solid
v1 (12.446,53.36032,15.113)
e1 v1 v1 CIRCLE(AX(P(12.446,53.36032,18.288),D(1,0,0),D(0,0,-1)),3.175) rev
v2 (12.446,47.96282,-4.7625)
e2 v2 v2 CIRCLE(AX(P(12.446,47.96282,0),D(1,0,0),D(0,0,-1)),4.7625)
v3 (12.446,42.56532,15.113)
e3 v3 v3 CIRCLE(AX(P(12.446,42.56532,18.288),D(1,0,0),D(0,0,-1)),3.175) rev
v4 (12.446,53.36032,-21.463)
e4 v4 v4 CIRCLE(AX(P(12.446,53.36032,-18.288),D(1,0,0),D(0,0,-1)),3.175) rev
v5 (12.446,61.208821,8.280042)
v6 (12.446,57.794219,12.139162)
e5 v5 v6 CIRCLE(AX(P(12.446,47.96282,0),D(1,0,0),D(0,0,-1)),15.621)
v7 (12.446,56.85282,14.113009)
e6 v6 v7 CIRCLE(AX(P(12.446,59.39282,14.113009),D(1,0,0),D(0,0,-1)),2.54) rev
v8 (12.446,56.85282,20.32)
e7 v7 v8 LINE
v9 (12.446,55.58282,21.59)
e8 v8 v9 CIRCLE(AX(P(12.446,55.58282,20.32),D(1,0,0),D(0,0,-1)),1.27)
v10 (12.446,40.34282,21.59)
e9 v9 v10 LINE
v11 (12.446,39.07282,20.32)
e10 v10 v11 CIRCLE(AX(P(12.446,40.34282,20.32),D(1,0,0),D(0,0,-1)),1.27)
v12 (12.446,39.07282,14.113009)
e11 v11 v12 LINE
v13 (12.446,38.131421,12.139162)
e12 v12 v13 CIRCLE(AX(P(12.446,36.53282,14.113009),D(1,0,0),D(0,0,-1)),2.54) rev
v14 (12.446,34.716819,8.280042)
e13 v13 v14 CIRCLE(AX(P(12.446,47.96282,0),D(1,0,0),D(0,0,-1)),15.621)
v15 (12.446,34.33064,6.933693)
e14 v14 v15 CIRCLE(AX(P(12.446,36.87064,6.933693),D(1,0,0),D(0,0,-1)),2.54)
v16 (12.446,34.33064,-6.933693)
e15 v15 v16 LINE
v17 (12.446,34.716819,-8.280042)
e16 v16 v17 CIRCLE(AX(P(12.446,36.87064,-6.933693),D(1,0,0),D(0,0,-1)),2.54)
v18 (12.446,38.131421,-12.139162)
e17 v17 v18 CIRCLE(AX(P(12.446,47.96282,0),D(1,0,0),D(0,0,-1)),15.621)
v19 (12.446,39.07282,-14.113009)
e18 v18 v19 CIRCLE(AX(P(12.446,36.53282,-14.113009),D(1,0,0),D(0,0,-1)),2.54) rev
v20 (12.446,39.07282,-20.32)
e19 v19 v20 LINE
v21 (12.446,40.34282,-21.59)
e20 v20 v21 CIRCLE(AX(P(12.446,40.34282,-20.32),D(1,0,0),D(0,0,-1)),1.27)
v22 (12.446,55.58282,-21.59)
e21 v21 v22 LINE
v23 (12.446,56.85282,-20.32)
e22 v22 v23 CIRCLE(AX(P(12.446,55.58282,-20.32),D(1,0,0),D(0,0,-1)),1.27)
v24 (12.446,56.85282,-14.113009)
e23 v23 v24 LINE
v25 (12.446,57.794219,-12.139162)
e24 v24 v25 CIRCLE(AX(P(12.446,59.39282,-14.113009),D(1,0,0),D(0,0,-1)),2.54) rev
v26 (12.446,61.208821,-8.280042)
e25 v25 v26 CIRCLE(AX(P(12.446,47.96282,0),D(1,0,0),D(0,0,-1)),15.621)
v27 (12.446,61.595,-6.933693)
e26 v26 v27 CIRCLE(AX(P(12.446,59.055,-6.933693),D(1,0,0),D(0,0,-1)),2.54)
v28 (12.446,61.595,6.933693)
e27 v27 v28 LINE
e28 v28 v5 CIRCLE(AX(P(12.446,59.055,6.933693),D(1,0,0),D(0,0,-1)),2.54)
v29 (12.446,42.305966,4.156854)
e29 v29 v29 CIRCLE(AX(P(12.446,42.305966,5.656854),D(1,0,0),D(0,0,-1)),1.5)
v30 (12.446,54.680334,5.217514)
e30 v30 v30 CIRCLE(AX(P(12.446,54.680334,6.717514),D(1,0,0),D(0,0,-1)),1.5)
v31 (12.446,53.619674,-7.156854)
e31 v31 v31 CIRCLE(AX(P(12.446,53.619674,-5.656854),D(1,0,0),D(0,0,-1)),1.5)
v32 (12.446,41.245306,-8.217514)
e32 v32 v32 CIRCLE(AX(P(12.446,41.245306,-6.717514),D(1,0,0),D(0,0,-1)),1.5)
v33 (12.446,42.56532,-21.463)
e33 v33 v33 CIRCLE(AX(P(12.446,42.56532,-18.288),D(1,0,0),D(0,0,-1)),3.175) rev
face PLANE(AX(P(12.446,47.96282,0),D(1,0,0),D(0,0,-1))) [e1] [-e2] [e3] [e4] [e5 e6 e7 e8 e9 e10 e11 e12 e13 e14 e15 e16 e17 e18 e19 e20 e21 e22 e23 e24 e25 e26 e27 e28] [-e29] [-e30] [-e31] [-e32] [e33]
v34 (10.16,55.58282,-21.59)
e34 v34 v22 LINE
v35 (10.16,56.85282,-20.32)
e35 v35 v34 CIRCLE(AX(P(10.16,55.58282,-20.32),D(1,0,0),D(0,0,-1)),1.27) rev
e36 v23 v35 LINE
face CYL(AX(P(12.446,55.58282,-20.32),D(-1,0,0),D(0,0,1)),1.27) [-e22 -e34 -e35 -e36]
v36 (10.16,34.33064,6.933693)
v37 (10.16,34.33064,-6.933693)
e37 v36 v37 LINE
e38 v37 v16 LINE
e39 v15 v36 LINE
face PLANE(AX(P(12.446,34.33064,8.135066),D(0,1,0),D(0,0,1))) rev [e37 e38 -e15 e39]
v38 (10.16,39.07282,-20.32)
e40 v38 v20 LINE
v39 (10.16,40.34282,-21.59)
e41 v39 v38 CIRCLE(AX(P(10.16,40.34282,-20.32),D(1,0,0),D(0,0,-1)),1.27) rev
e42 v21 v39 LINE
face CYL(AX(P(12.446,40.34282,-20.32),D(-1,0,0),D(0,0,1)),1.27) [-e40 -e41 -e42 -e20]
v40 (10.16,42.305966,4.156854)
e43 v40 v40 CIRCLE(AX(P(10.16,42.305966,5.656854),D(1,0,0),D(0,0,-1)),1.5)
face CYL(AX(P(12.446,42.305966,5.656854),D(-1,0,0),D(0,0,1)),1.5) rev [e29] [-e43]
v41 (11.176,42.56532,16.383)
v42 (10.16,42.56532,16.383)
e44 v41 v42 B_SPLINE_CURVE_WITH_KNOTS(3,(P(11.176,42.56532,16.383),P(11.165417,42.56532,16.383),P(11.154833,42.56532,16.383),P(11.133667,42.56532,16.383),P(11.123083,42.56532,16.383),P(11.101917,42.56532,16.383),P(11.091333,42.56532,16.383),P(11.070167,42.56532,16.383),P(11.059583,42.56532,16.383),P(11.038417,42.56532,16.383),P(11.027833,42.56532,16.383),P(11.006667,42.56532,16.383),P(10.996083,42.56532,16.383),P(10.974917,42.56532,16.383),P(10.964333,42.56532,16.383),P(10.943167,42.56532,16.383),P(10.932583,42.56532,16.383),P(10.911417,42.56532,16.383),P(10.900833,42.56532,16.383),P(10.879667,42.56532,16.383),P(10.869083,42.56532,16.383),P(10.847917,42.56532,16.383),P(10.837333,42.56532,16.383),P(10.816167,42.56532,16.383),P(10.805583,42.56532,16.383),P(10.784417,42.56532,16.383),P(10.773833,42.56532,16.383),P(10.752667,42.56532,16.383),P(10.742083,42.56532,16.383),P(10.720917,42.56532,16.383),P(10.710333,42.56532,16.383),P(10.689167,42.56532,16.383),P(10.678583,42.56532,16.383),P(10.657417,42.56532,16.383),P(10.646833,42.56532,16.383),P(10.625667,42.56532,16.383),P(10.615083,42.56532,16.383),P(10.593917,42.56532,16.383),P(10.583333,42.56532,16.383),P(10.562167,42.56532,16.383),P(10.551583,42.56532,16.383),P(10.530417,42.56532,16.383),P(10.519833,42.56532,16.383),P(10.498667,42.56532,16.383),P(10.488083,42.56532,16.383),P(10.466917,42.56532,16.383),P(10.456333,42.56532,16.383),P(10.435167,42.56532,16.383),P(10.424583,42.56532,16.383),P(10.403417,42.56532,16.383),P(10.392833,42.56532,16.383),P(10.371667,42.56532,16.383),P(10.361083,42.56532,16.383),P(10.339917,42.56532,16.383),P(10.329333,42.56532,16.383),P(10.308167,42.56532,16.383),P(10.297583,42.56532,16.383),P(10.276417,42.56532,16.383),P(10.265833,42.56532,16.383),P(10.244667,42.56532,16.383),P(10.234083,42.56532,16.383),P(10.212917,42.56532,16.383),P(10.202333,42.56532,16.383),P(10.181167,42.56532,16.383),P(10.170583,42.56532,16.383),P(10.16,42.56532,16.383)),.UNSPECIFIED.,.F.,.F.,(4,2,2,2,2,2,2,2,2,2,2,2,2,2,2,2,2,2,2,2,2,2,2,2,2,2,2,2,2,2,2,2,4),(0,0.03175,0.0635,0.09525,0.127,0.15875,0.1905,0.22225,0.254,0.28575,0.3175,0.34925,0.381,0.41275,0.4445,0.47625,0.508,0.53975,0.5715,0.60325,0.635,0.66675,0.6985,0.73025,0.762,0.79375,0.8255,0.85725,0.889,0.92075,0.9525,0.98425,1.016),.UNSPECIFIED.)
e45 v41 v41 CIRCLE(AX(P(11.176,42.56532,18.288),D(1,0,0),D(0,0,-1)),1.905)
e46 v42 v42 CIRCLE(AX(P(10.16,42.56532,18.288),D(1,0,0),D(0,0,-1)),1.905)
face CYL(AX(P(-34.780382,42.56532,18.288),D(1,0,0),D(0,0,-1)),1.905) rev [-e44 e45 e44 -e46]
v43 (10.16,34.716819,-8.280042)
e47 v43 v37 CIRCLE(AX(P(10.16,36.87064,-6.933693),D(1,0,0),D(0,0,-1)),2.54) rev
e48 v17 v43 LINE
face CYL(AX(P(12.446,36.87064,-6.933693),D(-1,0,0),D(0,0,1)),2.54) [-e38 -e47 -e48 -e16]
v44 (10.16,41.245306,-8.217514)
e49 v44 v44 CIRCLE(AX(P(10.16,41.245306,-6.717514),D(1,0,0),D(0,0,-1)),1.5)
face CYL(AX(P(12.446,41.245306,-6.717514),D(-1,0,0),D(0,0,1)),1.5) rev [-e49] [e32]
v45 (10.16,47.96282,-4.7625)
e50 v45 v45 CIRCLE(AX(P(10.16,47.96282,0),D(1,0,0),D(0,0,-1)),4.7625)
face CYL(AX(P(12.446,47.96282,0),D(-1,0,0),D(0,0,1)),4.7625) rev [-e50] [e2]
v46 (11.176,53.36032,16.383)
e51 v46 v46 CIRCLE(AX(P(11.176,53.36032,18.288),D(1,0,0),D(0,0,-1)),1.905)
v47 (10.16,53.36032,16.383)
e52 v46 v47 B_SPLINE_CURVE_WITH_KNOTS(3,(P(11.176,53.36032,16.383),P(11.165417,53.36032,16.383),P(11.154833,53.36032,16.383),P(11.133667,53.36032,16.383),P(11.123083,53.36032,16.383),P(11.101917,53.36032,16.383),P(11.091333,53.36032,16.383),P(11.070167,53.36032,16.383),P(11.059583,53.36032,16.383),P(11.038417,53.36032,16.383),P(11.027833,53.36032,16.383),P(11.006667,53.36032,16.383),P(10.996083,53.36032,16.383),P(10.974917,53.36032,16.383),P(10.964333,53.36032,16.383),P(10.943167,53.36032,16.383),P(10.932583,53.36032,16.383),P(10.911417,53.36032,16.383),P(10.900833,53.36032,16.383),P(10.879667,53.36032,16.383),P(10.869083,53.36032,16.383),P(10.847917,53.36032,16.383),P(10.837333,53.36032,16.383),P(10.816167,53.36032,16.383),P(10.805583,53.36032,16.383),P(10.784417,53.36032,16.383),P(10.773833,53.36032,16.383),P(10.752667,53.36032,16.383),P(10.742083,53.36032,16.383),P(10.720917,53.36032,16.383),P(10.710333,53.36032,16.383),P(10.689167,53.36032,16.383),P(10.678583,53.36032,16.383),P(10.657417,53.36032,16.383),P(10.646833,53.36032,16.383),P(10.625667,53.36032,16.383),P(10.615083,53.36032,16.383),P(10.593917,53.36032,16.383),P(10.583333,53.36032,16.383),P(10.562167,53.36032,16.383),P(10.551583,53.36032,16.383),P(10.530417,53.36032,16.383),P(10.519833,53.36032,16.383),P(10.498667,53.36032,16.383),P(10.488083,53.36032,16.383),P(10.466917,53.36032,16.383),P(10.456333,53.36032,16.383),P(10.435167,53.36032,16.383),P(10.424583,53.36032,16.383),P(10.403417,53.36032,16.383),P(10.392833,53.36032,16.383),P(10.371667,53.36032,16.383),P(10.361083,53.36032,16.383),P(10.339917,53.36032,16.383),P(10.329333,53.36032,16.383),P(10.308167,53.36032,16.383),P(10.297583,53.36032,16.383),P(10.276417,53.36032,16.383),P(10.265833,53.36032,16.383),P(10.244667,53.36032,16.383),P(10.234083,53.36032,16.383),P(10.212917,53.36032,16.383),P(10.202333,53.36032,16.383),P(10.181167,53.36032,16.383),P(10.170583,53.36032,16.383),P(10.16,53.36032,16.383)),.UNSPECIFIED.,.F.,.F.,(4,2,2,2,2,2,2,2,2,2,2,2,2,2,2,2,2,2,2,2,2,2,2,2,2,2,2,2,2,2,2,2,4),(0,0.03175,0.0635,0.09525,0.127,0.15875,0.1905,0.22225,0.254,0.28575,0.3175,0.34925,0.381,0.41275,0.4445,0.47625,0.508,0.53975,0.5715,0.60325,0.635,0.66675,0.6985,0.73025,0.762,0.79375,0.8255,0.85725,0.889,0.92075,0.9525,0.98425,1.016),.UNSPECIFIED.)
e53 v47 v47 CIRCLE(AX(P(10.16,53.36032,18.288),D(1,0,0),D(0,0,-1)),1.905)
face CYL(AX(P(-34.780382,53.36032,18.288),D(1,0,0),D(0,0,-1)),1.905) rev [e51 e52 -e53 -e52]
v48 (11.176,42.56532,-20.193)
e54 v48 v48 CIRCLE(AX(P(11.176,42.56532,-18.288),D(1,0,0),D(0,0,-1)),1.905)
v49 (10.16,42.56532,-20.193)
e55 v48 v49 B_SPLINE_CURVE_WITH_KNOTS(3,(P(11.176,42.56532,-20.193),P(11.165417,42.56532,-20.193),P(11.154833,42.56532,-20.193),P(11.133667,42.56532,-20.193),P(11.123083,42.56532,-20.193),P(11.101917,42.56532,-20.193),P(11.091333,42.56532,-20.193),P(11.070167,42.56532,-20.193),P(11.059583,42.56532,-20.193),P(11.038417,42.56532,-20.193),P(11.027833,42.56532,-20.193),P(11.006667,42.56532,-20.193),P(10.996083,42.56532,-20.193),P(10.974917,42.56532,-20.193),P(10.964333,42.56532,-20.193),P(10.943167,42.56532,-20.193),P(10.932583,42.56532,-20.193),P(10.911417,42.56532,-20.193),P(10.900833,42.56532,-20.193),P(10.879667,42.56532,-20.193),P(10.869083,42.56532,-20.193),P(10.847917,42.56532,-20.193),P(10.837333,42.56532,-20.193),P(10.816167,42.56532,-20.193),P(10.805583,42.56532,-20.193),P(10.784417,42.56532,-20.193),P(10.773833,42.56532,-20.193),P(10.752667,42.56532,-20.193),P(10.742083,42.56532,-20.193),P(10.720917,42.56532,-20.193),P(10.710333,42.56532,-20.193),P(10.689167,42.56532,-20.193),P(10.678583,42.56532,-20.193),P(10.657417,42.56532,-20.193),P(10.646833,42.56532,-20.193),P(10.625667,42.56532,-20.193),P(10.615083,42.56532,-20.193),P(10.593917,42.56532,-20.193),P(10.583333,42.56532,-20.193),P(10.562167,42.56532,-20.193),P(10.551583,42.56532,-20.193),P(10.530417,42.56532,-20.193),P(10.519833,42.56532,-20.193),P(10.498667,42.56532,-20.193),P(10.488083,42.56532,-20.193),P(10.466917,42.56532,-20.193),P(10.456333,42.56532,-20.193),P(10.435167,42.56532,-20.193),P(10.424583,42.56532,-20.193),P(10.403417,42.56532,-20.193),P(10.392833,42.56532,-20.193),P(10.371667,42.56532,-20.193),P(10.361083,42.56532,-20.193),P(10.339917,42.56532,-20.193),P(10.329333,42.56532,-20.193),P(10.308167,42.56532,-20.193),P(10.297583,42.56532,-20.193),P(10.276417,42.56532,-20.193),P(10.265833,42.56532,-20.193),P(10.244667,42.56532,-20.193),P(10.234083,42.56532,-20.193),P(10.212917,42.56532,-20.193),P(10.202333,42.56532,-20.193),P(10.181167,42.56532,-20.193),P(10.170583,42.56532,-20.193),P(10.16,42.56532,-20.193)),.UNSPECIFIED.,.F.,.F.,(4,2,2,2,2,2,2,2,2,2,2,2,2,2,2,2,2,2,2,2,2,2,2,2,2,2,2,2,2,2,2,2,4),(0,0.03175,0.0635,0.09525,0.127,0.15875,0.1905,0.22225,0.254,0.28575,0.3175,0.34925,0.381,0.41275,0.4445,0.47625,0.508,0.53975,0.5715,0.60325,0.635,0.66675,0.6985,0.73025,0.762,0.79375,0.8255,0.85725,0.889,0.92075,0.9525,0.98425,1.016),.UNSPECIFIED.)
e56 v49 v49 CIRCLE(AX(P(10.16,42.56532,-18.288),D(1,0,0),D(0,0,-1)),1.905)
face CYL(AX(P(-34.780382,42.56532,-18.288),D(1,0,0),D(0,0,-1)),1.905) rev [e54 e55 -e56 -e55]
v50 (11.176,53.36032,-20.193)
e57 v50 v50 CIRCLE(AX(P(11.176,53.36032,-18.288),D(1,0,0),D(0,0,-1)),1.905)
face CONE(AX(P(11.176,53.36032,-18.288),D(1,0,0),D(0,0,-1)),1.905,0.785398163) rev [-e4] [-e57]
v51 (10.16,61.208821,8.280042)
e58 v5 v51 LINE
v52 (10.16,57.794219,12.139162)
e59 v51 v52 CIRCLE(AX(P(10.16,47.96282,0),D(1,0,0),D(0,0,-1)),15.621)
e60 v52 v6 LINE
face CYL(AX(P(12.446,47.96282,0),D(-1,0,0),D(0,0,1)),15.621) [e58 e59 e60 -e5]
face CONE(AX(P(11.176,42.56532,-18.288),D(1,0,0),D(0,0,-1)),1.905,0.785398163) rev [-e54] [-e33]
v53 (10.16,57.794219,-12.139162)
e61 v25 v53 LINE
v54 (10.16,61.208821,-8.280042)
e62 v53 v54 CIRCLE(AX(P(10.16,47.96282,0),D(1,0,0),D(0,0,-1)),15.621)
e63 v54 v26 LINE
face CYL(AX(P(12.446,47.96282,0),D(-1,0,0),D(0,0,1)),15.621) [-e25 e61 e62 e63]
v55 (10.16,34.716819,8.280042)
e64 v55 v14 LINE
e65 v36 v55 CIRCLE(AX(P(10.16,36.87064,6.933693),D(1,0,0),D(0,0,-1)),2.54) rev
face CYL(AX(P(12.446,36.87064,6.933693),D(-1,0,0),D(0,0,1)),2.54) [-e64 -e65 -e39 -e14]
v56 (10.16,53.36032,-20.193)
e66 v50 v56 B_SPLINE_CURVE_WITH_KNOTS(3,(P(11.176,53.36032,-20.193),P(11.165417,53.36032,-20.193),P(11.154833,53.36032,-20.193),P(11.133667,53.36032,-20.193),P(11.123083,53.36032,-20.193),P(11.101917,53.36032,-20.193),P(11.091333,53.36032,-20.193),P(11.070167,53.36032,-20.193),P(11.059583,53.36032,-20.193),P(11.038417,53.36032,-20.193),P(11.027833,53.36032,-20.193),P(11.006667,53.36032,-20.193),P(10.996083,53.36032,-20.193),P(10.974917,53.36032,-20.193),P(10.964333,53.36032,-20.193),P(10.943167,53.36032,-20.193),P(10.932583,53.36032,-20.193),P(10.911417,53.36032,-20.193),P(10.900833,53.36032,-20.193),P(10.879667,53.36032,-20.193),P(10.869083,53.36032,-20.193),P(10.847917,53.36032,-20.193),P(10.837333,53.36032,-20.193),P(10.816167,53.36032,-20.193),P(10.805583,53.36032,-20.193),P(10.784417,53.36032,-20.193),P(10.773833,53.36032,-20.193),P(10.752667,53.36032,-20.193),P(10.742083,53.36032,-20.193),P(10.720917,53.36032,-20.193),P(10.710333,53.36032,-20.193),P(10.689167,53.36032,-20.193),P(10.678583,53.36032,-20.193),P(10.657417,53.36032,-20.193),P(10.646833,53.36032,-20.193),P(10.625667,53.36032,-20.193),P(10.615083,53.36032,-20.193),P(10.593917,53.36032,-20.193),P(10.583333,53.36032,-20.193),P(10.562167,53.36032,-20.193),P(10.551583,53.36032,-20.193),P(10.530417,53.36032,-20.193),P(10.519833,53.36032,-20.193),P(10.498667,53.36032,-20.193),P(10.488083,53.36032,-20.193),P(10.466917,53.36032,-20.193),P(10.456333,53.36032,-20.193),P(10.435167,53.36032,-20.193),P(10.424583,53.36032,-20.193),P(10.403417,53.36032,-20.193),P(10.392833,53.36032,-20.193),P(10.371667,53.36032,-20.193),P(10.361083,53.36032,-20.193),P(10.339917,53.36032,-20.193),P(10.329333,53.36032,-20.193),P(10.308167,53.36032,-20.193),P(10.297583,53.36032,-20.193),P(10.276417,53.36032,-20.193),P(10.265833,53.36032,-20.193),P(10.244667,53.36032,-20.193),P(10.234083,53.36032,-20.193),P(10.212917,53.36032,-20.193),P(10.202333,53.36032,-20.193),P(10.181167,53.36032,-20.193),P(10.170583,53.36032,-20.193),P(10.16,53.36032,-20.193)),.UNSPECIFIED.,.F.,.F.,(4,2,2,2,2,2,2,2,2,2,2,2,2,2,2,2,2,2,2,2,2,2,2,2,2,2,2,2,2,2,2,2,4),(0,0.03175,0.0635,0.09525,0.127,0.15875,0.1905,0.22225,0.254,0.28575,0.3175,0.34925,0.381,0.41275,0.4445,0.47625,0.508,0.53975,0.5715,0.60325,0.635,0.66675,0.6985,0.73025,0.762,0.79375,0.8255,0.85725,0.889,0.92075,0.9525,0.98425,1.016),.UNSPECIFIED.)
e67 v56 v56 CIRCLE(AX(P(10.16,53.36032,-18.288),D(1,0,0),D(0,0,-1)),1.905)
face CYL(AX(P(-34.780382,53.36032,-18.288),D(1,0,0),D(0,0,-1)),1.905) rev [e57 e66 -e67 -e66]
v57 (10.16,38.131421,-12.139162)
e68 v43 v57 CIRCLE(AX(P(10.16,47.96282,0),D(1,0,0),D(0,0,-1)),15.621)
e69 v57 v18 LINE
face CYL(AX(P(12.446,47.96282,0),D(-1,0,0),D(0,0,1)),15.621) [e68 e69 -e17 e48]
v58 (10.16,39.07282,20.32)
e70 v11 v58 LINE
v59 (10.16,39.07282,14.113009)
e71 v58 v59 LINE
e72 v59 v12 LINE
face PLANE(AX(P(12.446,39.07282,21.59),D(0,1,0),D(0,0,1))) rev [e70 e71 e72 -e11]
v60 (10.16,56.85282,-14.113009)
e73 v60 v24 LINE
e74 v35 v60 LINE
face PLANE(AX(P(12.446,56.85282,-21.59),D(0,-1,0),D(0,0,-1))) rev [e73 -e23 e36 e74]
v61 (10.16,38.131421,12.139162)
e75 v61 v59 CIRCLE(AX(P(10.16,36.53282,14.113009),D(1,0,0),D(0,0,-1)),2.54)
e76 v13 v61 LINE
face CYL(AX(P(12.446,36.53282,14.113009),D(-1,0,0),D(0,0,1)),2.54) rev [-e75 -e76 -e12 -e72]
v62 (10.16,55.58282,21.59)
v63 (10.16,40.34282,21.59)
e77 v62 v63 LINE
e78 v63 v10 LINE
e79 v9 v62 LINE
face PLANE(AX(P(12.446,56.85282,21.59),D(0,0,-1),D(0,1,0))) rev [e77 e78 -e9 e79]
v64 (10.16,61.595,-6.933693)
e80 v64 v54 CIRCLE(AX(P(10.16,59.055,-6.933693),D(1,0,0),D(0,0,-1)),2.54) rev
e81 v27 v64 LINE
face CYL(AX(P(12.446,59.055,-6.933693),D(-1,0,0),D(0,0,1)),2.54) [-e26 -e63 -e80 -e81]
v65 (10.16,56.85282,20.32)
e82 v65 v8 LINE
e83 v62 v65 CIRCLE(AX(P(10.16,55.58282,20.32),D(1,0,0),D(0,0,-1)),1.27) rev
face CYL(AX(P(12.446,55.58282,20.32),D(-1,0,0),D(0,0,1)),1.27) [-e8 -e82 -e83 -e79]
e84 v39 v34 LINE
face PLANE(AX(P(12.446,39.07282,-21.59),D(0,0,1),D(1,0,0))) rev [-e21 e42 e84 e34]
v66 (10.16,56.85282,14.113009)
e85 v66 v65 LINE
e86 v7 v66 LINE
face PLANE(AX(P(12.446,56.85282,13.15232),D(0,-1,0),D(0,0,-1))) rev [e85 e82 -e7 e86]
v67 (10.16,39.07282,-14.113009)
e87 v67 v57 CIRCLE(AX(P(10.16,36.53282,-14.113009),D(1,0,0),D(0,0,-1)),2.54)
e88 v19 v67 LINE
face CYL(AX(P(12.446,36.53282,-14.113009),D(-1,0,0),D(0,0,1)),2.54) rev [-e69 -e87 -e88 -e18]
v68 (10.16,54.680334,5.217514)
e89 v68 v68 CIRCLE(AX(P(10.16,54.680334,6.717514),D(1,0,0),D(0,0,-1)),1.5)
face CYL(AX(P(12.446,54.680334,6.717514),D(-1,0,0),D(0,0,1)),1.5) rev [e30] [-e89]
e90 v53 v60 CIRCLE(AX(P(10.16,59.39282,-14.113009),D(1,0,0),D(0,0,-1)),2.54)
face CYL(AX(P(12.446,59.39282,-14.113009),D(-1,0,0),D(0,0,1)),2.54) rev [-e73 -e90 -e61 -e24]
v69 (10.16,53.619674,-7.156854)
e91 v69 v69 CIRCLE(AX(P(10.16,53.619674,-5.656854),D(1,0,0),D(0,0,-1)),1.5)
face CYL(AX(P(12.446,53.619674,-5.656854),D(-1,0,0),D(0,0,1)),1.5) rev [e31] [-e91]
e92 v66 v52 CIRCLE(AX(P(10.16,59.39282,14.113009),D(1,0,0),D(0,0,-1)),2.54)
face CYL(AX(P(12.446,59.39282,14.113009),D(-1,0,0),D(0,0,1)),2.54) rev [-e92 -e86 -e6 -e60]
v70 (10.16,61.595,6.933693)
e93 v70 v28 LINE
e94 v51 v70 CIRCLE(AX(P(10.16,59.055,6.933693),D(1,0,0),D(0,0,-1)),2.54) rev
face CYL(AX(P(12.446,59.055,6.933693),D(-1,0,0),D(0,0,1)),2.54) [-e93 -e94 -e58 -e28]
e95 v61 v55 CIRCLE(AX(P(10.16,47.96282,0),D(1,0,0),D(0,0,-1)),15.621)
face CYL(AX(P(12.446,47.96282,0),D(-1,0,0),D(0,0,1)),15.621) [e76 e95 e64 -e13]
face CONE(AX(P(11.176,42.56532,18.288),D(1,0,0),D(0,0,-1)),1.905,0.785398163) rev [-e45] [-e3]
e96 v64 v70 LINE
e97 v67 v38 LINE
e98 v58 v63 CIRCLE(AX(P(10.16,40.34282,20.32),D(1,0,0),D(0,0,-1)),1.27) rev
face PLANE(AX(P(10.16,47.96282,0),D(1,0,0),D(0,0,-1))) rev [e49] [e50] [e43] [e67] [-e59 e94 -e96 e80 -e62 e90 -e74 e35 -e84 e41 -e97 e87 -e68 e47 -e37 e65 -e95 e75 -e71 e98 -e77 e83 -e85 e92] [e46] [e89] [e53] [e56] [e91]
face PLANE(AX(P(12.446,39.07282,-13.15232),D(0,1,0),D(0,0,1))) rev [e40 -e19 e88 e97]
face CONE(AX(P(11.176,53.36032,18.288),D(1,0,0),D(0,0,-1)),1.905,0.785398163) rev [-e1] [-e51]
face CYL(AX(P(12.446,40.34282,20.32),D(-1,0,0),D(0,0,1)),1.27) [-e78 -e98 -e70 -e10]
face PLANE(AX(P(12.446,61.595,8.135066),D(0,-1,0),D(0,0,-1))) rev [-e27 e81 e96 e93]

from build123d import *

# Parameters (mm, degrees)
STOCK_DGT_START                               = 10.16
STOCK_DGT_INSIDE_SWERVE_STRUCTURE_SM_2_R      = 1.905
STOCK_DGT_INSIDE_SWERVE_STRUCTURE_SM_2_R_2    = 1.5
STOCK_DGT_INSIDE_SWERVE_STRUCTURE_SM_2_R_3    = 4.7625
STOCK_DGT_INSIDE_SWERVE_STRUCTURE_SMALL_DEPTH = 2.286
CUT_EXTRUDE2_DEPTH                            = 66.309248357
FILLET1_R                                     = 2.54
FILLET2_R                                     = 1.27
CHAMFER1_SIZE                                 = 1.27


# Read off the part's stored shape, not the designer's step: Stock-DGT inside swerve structure Small Bearing-1
with BuildPart() as part:
    # Stock-DGT inside swerve structure Sm 2 → Stock-DGT inside swerve structure Small Bearing-1 (new body)
    with BuildSketch(Plane.YZ.offset(STOCK_DGT_START)):
        with BuildLine():
            ThreePointArc((34.33064, -8.13506567), (36.425690436, -10.904598407), (39.07282, -13.152320138))
            Line((39.07282, -13.152320138), (39.07282, -21.59))
            Line((39.07282, -21.59), (56.85282, -21.59))
            Line((56.85282, -21.59), (56.85282, -13.152320138))
            ThreePointArc((56.85282, -13.152320138), (59.499949564, -10.904598407), (61.595, -8.13506567))
            Line((61.595, -8.13506567), (61.595, 8.13506567))
            ThreePointArc((61.595, 8.13506567), (59.499949564, 10.904598407), (56.85282, 13.152320138))
            Line((56.85282, 13.152320138), (56.85282, 21.59))
            Line((56.85282, 21.59), (39.07282, 21.59))
            Line((39.07282, 21.59), (39.07282, 13.152320138))
            ThreePointArc((39.07282, 13.152320138), (36.425690436, 10.904598407), (34.33064, 8.13506567))
            Line((34.33064, 8.13506567), (34.33064, -8.13506567))
        make_face()
        with Locations((42.56532, -18.288)):
            Circle(STOCK_DGT_INSIDE_SWERVE_STRUCTURE_SM_2_R, mode=Mode.SUBTRACT)
        with Locations((41.245305579, -6.717514421)):
            Circle(STOCK_DGT_INSIDE_SWERVE_STRUCTURE_SM_2_R_2, mode=Mode.SUBTRACT)
        with Locations((53.36032, -18.288)):
            Circle(STOCK_DGT_INSIDE_SWERVE_STRUCTURE_SM_2_R, mode=Mode.SUBTRACT)
        with Locations((53.619674249, -5.656854249)):
            Circle(STOCK_DGT_INSIDE_SWERVE_STRUCTURE_SM_2_R_2, mode=Mode.SUBTRACT)
        with Locations((42.305965751, 5.656854249)):
            Circle(STOCK_DGT_INSIDE_SWERVE_STRUCTURE_SM_2_R_2, mode=Mode.SUBTRACT)
        with Locations((42.56532, 18.288)):
            Circle(STOCK_DGT_INSIDE_SWERVE_STRUCTURE_SM_2_R, mode=Mode.SUBTRACT)
        with Locations((47.96282, 0)):
            Circle(STOCK_DGT_INSIDE_SWERVE_STRUCTURE_SM_2_R_3, mode=Mode.SUBTRACT)
        with Locations((54.680334421, 6.717514421)):
            Circle(STOCK_DGT_INSIDE_SWERVE_STRUCTURE_SM_2_R_2, mode=Mode.SUBTRACT)
        with Locations((53.36032, 18.288)):
            Circle(STOCK_DGT_INSIDE_SWERVE_STRUCTURE_SM_2_R, mode=Mode.SUBTRACT)
    extrude(amount=STOCK_DGT_INSIDE_SWERVE_STRUCTURE_SMALL_DEPTH)

    # Sketch2 → Cut-Extrude2 (cut, through all)
    with BuildSketch(Plane.ZY.offset(-10.16)):
        with BuildLine():
            Line((-12.844591897, 56.85282), (-13.152320138, 56.85282))
            ThreePointArc((-13.152320138, 56.85282), (0, 63.83782), (13.152320138, 56.85282))
            Line((13.152320138, 56.85282), (12.844591897, 56.85282))
            ThreePointArc((12.844591897, 56.85282), (0, 63.58382), (-12.844591897, 56.85282))
        make_face()
        with BuildLine():
            Line((13.152320138, 39.07282), (12.844591897, 39.07282))
            ThreePointArc((12.844591897, 39.07282), (0, 32.34182), (-12.844591897, 39.07282))
            Line((-12.844591897, 39.07282), (-13.152320138, 39.07282))
            ThreePointArc((-13.152320138, 39.07282), (0, 32.08782), (13.152320138, 39.07282))
        make_face()
    extrude(amount=-CUT_EXTRUDE2_DEPTH, mode=Mode.SUBTRACT)

    # Fillet1
    fillet1_edges = [part.edges().sort_by_distance(p)[0] for p in [
        (11.303, 34.33064, 7.627536263),
        (11.303, 34.33064, -7.627536263),
        (11.303, 61.595, -7.627536263),
        (11.303, 61.595, 7.627536263),
        (11.303, 56.85282, 12.844591897),
        (11.303, 56.85282, -12.844591897),
        (11.303, 39.07282, -12.844591897),
        (11.303, 39.07282, 12.844591897),
    ]]
    fillet(fillet1_edges, radius=FILLET1_R)

    # Fillet2
    fillet2_edges = [part.edges().sort_by_distance(p)[0] for p in [
        (11.303, 39.07282, 21.59),
        (11.303, 56.85282, 21.59),
        (11.303, 56.85282, -21.59),
        (11.303, 39.07282, -21.59),
    ]]
    fillet(fillet2_edges, radius=FILLET2_R)

    # Chamfer1
    chamfer1_edges = [part.edges().sort_by_distance(p)[0] for p in [
        (12.446, 51.45532, 18.288),
        (12.446, 40.66032, -18.288),
        (12.446, 51.45532, -18.288),
        (12.446, 40.66032, 18.288),
    ]]
    chamfer(chamfer1_edges, length=CHAMFER1_SIZE)


solid = part.part
